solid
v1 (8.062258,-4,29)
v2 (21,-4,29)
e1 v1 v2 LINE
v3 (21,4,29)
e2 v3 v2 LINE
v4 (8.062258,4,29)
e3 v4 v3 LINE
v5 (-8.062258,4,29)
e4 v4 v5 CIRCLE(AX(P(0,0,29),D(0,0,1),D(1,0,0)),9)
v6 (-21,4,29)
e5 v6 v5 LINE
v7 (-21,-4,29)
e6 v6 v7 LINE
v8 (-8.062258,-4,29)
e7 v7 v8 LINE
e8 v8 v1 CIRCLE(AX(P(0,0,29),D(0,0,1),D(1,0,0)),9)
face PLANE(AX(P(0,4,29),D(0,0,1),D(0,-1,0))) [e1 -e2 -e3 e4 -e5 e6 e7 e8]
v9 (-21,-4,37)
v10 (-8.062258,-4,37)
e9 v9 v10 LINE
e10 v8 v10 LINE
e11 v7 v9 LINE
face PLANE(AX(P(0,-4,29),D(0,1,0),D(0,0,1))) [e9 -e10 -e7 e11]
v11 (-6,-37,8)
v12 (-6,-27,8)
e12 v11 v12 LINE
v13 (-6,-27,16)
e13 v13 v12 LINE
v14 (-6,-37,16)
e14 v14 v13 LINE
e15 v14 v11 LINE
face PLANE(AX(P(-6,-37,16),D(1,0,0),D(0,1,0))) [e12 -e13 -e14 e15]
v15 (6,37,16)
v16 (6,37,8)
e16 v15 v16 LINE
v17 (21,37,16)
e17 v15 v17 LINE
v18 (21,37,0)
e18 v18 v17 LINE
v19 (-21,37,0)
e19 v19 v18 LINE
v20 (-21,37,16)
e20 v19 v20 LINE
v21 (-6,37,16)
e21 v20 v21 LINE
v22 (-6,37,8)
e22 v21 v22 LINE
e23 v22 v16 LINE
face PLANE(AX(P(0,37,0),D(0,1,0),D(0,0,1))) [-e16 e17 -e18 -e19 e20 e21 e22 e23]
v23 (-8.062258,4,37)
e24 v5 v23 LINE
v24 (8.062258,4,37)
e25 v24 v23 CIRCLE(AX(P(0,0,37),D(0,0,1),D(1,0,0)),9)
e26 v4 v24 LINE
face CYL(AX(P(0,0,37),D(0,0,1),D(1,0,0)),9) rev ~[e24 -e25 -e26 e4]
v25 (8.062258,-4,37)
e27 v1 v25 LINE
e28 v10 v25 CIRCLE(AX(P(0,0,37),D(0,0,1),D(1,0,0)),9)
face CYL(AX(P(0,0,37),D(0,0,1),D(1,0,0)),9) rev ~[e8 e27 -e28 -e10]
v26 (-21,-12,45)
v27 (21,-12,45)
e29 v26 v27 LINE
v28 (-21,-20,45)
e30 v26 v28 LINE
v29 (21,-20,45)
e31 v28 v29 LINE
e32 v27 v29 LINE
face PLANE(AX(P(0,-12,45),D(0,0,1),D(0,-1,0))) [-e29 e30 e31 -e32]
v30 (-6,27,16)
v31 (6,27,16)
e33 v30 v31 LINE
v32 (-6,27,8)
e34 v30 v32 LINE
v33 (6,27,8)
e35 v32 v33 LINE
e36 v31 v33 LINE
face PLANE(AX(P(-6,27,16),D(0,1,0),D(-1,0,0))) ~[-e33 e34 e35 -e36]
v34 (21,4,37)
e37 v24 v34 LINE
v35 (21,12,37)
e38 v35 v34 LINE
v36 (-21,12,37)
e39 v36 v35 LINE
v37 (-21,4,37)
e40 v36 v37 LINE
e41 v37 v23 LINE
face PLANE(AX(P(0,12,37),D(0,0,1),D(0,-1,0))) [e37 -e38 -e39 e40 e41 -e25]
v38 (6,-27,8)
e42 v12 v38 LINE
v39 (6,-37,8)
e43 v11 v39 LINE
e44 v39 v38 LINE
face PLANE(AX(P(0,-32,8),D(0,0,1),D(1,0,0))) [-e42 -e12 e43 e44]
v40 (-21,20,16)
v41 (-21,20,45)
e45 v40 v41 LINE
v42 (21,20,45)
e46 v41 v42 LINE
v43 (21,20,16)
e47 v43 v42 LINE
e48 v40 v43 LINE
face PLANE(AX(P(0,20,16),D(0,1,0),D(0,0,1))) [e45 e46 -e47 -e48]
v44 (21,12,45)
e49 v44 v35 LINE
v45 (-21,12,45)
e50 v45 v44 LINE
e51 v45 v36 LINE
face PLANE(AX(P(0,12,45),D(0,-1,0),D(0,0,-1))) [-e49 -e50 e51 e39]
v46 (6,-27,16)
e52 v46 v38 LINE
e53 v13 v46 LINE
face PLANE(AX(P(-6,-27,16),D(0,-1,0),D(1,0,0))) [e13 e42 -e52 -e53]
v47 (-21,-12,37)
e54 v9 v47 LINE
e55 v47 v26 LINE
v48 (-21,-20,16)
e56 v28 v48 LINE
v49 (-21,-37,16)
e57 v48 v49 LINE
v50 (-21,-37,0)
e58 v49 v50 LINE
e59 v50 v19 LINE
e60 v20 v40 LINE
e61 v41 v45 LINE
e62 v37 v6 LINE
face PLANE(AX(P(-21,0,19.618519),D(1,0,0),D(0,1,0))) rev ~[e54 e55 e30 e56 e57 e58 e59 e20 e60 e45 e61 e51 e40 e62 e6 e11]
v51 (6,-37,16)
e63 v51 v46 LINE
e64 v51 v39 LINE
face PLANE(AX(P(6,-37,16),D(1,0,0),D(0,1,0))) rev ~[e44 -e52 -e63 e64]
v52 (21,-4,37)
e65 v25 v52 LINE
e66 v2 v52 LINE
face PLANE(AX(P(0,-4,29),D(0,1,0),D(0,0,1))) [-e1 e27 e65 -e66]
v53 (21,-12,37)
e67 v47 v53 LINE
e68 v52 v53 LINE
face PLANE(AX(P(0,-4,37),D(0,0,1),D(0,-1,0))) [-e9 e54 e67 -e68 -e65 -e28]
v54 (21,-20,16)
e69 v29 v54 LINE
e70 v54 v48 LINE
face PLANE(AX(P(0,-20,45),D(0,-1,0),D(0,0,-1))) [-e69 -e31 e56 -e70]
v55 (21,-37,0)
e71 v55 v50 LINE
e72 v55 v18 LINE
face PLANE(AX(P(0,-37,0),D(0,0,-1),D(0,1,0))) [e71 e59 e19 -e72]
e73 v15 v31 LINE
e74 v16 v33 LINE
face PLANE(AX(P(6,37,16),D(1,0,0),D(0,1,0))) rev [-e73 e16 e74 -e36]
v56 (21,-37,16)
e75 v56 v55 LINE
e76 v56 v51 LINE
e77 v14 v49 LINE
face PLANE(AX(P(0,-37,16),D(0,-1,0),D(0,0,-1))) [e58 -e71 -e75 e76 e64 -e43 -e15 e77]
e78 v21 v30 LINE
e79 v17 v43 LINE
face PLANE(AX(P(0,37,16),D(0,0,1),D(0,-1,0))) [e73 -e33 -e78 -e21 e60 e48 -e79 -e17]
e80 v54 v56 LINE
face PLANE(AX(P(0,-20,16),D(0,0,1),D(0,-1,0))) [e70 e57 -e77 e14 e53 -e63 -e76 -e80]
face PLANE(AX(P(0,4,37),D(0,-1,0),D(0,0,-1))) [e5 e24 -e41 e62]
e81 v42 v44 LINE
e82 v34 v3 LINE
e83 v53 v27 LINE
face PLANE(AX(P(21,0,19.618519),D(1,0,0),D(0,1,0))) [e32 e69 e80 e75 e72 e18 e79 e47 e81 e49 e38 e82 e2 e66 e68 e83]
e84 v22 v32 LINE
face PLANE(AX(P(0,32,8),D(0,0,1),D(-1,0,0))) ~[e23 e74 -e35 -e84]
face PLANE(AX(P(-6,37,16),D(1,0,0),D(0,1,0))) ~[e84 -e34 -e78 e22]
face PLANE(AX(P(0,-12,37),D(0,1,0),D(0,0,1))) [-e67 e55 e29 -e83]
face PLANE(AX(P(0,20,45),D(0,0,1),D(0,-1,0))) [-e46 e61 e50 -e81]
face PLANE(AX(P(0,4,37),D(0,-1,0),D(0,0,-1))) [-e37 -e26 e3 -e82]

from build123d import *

# Parameters (mm, degrees)
F1_DEPTH = 21
F2_R     = 9
F3_DEPTH = 8
F4_W     = 12
F4_H     = 10
F5_DEPTH = 8


# Not quite as in the source:
# - a pattern or mirror of a feature is missing from the dataset's text; its kind, count and spacing are read off the source's solid


with BuildPart() as f1:
    # F0 (on Right) → F1 (new body, symmetric)
    with BuildSketch(Plane.YZ):
        Polygon((-37, 0), (0, 0), (37, 0), (37, 16), (20, 16), (20, 45), (12, 45), (12, 37), (4, 37), (4, 29), (0, 29), (-4, 29), (-4, 37), (-12, 37), (-12, 45), (-20, 45), (-20, 16), (-37, 16), align=None)
    extrude(amount=F1_DEPTH, both=True)

    # F2 (on face) → F3 (cut, through all)
    with BuildSketch(Plane.XY.offset(37)):
        Circle(F2_R)
    extrude(amount=-F3_DEPTH, mode=Mode.SUBTRACT)

    # F4 (on face) → F5 (cut)
    with BuildSketch(Plane.XY.offset(16)):
        with Locations((0, -32)):
            Rectangle(F4_W, F4_H)
    f5 = extrude(amount=-F5_DEPTH, mode=Mode.SUBTRACT)

    # F5_copies: F5 across plane
    add(f5.mirror(Plane.ZX), mode=Mode.SUBTRACT)


solid = f1.part
